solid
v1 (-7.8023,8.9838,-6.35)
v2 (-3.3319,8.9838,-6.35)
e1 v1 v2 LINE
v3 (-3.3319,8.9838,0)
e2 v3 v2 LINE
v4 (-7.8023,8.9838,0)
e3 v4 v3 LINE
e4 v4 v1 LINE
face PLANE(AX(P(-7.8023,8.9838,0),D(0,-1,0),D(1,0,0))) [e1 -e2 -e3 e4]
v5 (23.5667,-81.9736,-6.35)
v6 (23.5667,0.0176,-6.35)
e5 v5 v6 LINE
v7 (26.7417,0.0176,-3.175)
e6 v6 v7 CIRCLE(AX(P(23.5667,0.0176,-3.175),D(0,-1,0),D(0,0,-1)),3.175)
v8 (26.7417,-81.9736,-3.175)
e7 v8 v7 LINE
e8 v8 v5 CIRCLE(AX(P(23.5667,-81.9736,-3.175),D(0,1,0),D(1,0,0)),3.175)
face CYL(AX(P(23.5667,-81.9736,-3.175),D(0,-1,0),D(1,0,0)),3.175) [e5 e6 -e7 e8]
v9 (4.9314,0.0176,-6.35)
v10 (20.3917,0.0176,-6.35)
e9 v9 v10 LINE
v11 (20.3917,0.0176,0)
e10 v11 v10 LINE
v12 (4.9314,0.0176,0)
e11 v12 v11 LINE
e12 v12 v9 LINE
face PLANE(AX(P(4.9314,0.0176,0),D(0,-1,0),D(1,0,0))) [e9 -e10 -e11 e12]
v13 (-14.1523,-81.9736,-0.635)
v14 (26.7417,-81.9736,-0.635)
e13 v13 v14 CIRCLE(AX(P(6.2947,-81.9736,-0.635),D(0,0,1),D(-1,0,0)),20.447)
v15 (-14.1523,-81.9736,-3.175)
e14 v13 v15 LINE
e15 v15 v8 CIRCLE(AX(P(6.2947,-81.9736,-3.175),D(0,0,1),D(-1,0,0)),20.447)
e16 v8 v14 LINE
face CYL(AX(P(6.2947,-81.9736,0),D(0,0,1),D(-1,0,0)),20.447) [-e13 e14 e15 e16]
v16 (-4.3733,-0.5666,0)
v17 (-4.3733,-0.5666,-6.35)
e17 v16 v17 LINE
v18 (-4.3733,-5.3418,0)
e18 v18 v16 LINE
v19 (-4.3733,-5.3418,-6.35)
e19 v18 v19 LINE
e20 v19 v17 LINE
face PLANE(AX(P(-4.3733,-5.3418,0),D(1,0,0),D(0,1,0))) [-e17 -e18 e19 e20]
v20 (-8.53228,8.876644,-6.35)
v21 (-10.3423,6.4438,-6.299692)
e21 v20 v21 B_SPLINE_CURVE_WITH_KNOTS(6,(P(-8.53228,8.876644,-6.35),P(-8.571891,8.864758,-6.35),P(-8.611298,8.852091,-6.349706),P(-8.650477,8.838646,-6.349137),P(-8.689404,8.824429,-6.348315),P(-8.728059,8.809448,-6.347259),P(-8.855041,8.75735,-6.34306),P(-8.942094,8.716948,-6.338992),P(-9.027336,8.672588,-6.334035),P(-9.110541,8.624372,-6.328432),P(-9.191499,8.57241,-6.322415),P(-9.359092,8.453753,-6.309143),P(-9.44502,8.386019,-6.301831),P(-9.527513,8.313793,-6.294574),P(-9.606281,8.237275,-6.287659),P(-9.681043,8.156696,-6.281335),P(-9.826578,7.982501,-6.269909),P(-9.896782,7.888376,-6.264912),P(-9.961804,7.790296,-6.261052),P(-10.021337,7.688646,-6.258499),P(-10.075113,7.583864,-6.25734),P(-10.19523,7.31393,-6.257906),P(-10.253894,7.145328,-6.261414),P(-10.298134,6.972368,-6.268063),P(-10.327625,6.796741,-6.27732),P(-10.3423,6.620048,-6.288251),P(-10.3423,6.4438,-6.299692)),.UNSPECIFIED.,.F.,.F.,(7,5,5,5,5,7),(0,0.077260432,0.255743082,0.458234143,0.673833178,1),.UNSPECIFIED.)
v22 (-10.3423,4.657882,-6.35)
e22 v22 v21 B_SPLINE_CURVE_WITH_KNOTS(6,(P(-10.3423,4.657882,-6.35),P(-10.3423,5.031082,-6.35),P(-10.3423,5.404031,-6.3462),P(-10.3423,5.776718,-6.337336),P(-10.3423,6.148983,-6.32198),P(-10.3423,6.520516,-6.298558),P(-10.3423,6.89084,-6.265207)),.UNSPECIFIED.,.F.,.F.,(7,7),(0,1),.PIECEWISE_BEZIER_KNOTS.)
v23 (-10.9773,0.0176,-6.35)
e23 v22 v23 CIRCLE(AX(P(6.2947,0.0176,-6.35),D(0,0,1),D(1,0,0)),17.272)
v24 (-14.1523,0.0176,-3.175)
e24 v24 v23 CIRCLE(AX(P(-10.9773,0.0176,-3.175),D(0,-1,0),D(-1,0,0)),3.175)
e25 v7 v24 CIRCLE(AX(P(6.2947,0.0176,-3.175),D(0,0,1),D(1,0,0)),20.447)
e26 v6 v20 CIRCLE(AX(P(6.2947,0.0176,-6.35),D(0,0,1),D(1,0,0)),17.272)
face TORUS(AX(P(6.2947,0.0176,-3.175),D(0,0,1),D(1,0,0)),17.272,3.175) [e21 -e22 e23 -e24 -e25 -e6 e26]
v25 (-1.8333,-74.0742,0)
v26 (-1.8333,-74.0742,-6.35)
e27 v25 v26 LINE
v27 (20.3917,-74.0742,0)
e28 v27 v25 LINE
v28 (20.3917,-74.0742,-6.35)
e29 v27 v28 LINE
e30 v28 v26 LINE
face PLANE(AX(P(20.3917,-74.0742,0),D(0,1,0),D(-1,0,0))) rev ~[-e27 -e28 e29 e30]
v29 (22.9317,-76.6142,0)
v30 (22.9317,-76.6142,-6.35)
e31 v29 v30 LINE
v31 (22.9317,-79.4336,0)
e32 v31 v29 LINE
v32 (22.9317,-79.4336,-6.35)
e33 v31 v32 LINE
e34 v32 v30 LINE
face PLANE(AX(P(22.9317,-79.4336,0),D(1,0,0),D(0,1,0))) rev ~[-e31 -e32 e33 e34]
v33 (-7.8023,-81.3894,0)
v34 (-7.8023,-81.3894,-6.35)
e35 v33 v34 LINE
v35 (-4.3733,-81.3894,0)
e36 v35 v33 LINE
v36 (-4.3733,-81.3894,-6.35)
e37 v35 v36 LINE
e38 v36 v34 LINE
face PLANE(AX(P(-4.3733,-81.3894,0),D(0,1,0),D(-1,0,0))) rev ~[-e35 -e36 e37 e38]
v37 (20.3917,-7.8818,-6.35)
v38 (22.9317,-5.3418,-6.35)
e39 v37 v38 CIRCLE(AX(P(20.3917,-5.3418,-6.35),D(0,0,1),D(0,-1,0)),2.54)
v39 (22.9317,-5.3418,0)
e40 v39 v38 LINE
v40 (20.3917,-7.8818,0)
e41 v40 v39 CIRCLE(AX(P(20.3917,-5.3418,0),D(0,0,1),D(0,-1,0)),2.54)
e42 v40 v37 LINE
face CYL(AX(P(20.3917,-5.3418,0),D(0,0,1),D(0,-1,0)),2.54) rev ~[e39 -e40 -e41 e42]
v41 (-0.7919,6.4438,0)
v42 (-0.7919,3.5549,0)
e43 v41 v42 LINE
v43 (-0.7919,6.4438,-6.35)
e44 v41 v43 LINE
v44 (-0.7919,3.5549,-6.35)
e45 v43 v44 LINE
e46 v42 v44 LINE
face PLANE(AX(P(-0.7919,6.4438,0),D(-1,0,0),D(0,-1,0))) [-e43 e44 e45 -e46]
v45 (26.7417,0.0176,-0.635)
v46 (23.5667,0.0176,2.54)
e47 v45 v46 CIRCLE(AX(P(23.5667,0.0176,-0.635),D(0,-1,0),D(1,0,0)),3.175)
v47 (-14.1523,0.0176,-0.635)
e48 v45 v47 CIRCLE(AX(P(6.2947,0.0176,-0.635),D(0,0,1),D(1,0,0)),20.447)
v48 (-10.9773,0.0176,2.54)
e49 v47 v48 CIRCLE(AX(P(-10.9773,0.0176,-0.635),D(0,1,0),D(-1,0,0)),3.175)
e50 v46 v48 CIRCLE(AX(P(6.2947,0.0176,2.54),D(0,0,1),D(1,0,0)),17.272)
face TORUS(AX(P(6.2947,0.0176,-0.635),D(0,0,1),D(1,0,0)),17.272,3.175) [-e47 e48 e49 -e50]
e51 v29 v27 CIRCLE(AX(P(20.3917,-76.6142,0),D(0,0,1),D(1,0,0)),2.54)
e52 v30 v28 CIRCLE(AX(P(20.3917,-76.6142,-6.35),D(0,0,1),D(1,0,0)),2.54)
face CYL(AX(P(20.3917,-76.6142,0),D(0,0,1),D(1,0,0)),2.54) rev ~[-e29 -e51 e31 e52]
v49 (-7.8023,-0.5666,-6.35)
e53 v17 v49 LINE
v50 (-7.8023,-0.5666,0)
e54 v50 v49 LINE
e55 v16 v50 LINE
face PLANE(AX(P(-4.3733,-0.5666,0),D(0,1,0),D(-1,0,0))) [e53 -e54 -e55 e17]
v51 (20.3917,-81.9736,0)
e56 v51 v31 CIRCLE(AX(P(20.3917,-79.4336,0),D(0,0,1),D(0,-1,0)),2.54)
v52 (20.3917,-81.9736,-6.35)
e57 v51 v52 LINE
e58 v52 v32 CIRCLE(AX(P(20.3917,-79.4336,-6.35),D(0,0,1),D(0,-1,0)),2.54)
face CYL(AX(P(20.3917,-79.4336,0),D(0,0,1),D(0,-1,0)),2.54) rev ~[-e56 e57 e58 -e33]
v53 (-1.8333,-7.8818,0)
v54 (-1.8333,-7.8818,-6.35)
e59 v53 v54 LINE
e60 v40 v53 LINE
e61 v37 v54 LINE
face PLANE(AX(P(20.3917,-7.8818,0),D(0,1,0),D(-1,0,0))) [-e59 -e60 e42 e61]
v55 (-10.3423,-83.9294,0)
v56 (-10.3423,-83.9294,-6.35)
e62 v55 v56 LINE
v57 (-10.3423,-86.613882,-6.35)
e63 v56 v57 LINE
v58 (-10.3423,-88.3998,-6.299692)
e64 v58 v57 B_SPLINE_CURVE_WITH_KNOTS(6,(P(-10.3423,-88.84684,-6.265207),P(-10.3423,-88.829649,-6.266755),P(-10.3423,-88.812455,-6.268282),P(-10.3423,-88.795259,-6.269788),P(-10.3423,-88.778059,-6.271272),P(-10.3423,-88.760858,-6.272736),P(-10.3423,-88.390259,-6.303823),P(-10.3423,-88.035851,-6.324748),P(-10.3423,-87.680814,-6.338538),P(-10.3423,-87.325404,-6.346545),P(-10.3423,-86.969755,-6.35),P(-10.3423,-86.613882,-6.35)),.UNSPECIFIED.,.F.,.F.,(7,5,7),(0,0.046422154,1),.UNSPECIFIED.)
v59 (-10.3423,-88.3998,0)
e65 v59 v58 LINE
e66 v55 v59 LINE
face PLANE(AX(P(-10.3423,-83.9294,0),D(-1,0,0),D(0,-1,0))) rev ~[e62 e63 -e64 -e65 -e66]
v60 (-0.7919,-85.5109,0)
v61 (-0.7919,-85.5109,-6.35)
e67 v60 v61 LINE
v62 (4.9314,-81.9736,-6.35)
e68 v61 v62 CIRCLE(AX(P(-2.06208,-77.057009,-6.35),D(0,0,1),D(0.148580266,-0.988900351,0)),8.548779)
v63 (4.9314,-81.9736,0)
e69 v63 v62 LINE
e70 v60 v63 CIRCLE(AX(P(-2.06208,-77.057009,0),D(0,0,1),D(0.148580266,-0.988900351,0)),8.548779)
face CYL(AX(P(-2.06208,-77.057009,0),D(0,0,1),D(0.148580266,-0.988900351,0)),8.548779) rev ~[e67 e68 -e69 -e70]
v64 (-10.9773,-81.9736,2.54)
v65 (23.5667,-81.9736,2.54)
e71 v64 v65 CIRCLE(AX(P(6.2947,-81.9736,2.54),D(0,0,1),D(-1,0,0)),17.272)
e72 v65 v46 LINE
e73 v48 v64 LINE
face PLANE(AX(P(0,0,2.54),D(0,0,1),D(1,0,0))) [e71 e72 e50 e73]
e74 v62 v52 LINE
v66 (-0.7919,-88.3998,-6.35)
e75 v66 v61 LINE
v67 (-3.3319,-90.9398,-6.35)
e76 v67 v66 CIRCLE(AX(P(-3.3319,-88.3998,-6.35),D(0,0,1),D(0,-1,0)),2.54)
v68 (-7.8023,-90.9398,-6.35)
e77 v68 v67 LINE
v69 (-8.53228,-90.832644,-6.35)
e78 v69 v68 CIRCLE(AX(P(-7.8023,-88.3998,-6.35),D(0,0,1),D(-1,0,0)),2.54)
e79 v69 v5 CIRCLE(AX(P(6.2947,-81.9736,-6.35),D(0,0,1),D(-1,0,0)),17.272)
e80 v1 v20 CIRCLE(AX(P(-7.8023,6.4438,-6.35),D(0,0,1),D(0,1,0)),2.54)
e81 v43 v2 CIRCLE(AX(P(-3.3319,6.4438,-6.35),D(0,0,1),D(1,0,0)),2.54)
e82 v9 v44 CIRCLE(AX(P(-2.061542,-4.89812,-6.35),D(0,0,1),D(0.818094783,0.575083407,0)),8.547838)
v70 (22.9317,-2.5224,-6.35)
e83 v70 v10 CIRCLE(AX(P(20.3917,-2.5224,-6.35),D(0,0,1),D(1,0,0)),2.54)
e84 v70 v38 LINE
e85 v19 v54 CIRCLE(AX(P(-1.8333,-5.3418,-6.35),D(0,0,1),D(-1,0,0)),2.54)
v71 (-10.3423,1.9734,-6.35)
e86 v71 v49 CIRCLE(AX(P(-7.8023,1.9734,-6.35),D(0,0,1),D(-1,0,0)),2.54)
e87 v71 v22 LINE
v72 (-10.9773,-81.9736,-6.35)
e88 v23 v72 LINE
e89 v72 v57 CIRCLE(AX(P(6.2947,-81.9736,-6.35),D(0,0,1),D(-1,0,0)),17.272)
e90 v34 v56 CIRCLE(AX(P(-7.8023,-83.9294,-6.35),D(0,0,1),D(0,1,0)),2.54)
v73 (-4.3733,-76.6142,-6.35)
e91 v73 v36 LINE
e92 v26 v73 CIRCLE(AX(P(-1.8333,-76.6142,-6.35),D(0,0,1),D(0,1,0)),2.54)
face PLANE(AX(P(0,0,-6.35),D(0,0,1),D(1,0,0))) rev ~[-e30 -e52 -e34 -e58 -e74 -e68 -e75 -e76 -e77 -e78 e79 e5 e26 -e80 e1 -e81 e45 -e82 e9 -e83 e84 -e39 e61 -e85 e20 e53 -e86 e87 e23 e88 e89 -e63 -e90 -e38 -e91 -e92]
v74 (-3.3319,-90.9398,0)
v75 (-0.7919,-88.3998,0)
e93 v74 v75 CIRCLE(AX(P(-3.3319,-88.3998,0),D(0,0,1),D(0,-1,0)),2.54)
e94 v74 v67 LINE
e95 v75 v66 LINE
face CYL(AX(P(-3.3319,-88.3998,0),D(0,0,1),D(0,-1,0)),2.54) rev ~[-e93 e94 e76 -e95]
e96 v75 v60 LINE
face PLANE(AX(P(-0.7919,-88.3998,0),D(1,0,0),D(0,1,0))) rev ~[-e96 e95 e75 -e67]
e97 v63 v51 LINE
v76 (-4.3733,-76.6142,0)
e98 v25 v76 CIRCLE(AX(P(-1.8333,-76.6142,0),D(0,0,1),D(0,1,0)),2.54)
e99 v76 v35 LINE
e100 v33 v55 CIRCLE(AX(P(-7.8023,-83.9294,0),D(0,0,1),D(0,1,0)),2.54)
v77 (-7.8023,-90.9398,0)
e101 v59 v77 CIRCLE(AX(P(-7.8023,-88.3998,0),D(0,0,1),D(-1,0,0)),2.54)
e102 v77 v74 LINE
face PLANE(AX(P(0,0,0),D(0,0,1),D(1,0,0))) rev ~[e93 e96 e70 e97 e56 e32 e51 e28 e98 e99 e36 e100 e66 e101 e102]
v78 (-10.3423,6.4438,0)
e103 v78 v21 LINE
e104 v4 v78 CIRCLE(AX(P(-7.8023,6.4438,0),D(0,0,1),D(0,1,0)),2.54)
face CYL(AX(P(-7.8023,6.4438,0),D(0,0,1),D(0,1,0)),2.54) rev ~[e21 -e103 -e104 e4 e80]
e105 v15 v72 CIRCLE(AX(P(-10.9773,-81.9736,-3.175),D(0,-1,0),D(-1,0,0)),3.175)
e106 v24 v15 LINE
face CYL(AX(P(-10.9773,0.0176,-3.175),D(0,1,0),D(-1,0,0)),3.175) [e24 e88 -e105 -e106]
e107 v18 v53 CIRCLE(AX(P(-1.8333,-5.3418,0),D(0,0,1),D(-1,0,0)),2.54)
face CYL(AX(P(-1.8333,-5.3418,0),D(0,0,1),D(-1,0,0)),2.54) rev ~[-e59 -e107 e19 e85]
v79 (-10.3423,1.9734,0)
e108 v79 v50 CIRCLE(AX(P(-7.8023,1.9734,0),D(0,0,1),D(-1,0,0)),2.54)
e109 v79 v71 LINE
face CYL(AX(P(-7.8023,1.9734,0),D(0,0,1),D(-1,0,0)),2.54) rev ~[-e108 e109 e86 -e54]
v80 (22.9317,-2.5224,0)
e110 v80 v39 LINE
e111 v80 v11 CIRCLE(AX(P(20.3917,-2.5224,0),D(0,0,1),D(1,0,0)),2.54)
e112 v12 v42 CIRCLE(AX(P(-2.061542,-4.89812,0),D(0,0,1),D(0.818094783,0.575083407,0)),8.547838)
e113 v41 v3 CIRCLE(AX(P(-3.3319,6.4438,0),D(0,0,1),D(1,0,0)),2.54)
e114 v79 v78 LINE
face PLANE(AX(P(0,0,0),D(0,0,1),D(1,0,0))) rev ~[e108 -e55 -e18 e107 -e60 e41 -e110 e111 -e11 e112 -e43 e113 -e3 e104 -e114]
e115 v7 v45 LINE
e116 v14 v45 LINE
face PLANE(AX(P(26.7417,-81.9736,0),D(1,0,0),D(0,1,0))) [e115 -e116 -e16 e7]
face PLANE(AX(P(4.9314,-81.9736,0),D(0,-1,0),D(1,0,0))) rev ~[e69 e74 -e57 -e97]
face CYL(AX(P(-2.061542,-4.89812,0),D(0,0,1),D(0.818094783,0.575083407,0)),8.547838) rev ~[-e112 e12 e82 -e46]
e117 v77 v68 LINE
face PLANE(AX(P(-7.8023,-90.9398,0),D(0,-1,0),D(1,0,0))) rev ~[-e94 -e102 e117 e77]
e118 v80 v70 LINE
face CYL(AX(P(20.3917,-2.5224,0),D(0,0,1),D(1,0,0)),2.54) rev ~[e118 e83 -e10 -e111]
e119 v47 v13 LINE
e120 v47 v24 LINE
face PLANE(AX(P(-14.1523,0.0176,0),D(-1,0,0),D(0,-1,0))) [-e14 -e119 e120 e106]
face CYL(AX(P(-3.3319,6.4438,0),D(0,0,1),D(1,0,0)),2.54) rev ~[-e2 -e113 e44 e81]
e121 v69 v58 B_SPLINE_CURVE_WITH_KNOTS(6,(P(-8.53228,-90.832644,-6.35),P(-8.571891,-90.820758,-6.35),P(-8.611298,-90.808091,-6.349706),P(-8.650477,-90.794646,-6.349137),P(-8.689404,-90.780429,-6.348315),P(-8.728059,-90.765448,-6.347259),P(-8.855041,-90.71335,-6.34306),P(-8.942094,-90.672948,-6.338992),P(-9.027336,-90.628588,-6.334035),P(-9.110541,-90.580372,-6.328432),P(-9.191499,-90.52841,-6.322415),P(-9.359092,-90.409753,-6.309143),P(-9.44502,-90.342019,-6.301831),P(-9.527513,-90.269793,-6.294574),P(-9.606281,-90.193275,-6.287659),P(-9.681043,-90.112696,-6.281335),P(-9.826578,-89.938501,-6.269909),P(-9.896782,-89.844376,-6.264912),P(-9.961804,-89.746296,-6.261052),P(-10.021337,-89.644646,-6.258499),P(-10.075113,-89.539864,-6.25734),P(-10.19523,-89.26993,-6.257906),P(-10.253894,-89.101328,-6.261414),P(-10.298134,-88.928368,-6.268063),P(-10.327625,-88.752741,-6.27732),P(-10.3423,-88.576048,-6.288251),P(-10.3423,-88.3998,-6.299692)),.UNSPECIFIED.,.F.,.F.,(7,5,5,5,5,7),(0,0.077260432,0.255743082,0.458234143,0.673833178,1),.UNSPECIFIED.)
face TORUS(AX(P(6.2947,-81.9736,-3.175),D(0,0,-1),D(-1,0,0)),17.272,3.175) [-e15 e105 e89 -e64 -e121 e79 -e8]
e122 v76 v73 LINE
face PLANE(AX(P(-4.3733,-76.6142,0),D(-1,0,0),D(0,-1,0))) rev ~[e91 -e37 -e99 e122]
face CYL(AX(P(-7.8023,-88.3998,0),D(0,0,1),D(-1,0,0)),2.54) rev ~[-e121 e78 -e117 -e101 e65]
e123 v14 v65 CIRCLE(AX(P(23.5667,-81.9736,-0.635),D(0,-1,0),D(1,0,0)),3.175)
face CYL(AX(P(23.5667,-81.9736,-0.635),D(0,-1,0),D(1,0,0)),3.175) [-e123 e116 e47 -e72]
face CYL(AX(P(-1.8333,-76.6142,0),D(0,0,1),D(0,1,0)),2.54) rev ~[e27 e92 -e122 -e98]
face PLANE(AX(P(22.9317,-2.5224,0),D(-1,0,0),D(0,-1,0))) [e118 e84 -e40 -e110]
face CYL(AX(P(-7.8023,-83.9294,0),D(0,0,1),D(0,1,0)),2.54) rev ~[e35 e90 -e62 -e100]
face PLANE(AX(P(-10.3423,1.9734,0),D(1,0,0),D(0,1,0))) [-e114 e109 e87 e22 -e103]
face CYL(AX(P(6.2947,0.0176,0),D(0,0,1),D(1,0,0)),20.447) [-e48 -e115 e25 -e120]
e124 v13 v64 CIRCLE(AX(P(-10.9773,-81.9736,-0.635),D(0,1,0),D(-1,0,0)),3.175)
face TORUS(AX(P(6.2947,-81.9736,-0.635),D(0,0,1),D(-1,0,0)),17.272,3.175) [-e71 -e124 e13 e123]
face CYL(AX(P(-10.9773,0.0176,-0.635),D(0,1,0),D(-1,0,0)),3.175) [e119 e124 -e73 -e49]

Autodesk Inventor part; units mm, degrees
ref_plane "YZ Plane" through (0, 0, 0) normal (1, 0, 0) x (0, 1, 0)
ref_plane "XZ Plane" through (0, 0, 0) normal (0, 1, 0) x (-1, 0, 0)
ref_plane "XY Plane" through (0, 0, 0) normal (0, 0, 1) x (1, 0, 0)
ref_plane "Work Plane1" through (0, 0, 0) normal (0, 0, 1) x (1, 0, 0)
sketch "Sketch1" plane through (0, 0, 0) normal (0, 0, 1) x (1, 0, 0)
  arc A0 (20.3917, -80.7036) -> (21.6617, -79.4336) centre (20.3917, -79.4336) ccw projected
  line L0 (21.6617, -79.4336) -> (21.6617, -76.6142) projected
  arc A1 (21.6617, -76.6142) -> (20.3917, -75.3442) centre (20.3917, -76.6142) ccw projected
  line L1 (20.3917, -75.3442) -> (-1.8333, -75.3442) projected
  arc A2 (-1.8333, -75.3442) -> (-3.1033, -76.6142) centre (-1.8333, -76.6142) ccw projected
  line L2 (-3.1033, -76.6142) -> (-3.1033, -81.3894) projected
  arc A3 (-4.3733, -82.6594) -> (-3.1033, -81.3894) centre (-4.3733, -81.3894) ccw projected
  line L3 (-4.3733, -82.6594) -> (-7.8023, -82.6594) projected
  arc A4 (-7.8023, -82.6594) -> (-9.0723, -83.9294) centre (-7.8023, -83.9294) ccw projected
  line L4 (-9.0723, -83.9294) -> (-9.0723, -88.3998) projected
  arc A5 (-9.0723, -88.3998) -> (-7.8023, -89.6698) centre (-7.8023, -88.3998) ccw projected
  line L5 (-7.8023, -89.6698) -> (-3.3319, -89.6698) projected
  arc A6 (-3.3319, -89.6698) -> (-2.0619, -88.3998) centre (-3.3319, -88.3998) ccw projected
  line L6 (-2.0619, -88.3998) -> (-2.0619, -85.5109) projected
  arc A7 (-0.9806, -84.255) -> (-2.0619, -85.5109) centre (-0.7919, -85.5109) ccw projected
  arc A8 (-0.9806, -84.255) -> (4.2373, -80.7036) centre (-2.0619, -77.0575) ccw projected
  line L7 (4.2373, -80.7036) -> (20.3917, -80.7036) projected
  arc A9 (21.6617, -2.5224) -> (20.3917, -1.2524) centre (20.3917, -2.5224) ccw projected
  line L8 (4.2373, -1.2524) -> (20.3917, -1.2524) projected
  arc A10 (4.2373, -1.2524) -> (-0.9806, 2.299) centre (-2.0619, -4.8985) ccw projected
  arc A11 (-2.0619, 3.5549) -> (-0.9806, 2.299) centre (-0.7919, 3.5549) ccw projected
  line L9 (-2.0619, 6.4438) -> (-2.0619, 3.5549) projected
  arc A12 (-2.0619, 6.4438) -> (-3.3319, 7.7138) centre (-3.3319, 6.4438) ccw projected
  line L10 (-7.8023, 7.7138) -> (-3.3319, 7.7138) projected
  arc A13 (-7.8023, 7.7138) -> (-9.0723, 6.4438) centre (-7.8023, 6.4438) ccw projected
  line L11 (-9.0723, 1.9734) -> (-9.0723, 6.4438) projected
  arc A14 (-9.0723, 1.9734) -> (-7.8023, 0.7034) centre (-7.8023, 1.9734) ccw projected
  line L12 (-4.3733, 0.7034) -> (-7.8023, 0.7034) projected
  arc A15 (-3.1033, -0.5666) -> (-4.3733, 0.7034) centre (-4.3733, -0.5666) ccw projected
  line L13 (-3.1033, -5.3418) -> (-3.1033, -0.5666) projected
  arc A16 (-3.1033, -5.3418) -> (-1.8333, -6.6118) centre (-1.8333, -5.3418) ccw projected
  line L14 (20.3917, -6.6118) -> (-1.8333, -6.6118) projected
  arc A17 (20.3917, -6.6118) -> (21.6617, -5.3418) centre (20.3917, -5.3418) ccw projected
  line L15 (21.6617, -2.5224) -> (21.6617, -5.3418) projected
  arc A18 (20.3917, -81.9736) -> (22.9317, -79.4336) centre (20.3917, -79.4336) ccw
  line L16 (22.9317, -79.4336) -> (22.9317, -76.6142)
  arc A19 (22.9317, -76.6142) -> (20.3917, -74.0742) centre (20.3917, -76.6142) ccw
  line L17 (20.3917, -74.0742) -> (-1.8333, -74.0742)
  arc A20 (-1.8333, -74.0742) -> (-4.3733, -76.6142) centre (-1.8333, -76.6142) ccw
  line L18 (-4.3733, -76.6142) -> (-4.3733, -81.3894)
  line L19 (-4.3733, -81.3894) -> (-7.8023, -81.3894)
  arc A21 (-7.8023, -81.3894) -> (-10.3423, -83.9294) centre (-7.8023, -83.9294) ccw
  line L20 (-10.3423, -83.9294) -> (-10.3423, -88.3998)
  arc A22 (-10.3423, -88.3998) -> (-7.8023, -90.9398) centre (-7.8023, -88.3998) ccw
  line L21 (-7.8023, -90.9398) -> (-3.3319, -90.9398)
  arc A23 (-3.3319, -90.9398) -> (-0.7919, -88.3998) centre (-3.3319, -88.3998) ccw
  line L22 (-0.7919, -88.3998) -> (-0.7919, -85.5109)
  arc A24 (-0.7919, -85.5109) -> (4.9314, -81.9736) centre (-2.0619, -77.0575) ccw
  line L23 (4.9314, -81.9736) -> (20.3917, -81.9736)
  arc A25 (-4.3733, -5.3418) -> (-1.8333, -7.8818) centre (-1.8333, -5.3418) ccw
  line L24 (-4.3733, -5.3418) -> (-4.3733, -0.5666)
  line L25 (-4.3733, -0.5666) -> (-7.8023, -0.5666)
  arc A26 (-10.3423, 1.9734) -> (-7.8023, -0.5666) centre (-7.8023, 1.9734) ccw
  line L26 (-10.3423, 1.9734) -> (-10.3423, 6.4438)
  arc A27 (-7.8023, 8.9838) -> (-10.3423, 6.4438) centre (-7.8023, 6.4438) ccw
  line L27 (-7.8023, 8.9838) -> (-3.3319, 8.9838)
  arc A28 (-0.7919, 6.4438) -> (-3.3319, 8.9838) centre (-3.3319, 6.4438) ccw
  line L28 (-0.7919, 6.4438) -> (-0.7919, 3.5549)
  arc A29 (4.9314, 0.0176) -> (-0.7919, 3.5549) centre (-2.0619, -4.8985) ccw
  line L29 (4.9314, 0.0176) -> (20.3917, 0.0176)
  arc A30 (22.9317, -2.5224) -> (20.3917, 0.0176) centre (20.3917, -2.5224) ccw
  line L30 (22.9317, -2.5224) -> (22.9317, -5.3418)
  arc A31 (20.3917, -7.8818) -> (22.9317, -5.3418) centre (20.3917, -5.3418) ccw
  line L31 (20.3917, -7.8818) -> (-1.8333, -7.8818)
  line L32 (6.2947, -102.4206) -> (6.2947, 20.4646) construction
  line L33 (26.7417, -81.9736) -> (26.7417, 0.0176)
  line L34 (-14.1523, 0.0176) -> (-14.1523, -81.9736)
  arc A32 (-14.1523, -81.9736) -> (26.7417, -81.9736) centre (6.2947, -81.9736) ccw
  arc A33 (26.7417, 0.0176) -> (-14.1523, 0.0176) centre (6.2947, 0.0176) ccw
  point P0 (0, 0)
  point P1 (6.2947, -40.978)
  dimension "d0" = 1.27
  dimension "d1" = 1.27
  dimension "d2" = 3.81
  dimension "d3" = 3.81
  dimension "d4" = 33.0962
  dimension "d5" = 33.0962
extrude "Extrusion1" add sketch "Sketch1" against normal blind 6.35 contours A32 L34 A33 L33
sketch "Sketch2" plane through (0, 0, 0) normal (0, 0, 1) x (1, 0, 0)
  line L0 (20.3917, -7.8818) -> (-1.8333, -7.8818) projected
  arc A0 (-4.3733, -5.3418) -> (-1.8333, -7.8818) centre (-1.8333, -5.3418) ccw projected
  line L1 (-4.3733, -5.3418) -> (-4.3733, -0.5666) projected
  line L2 (-4.3733, -0.5666) -> (-7.8023, -0.5666) projected
  arc A1 (-10.3423, 1.9734) -> (-7.8023, -0.5666) centre (-7.8023, 1.9734) ccw projected
  line L3 (-10.3423, 1.9734) -> (-10.3423, 6.4438) projected
  arc A2 (-7.8023, 8.9838) -> (-10.3423, 6.4438) centre (-7.8023, 6.4438) ccw projected
  line L4 (-7.8023, 8.9838) -> (-3.3319, 8.9838) projected
  arc A3 (-0.7919, 6.4438) -> (-3.3319, 8.9838) centre (-3.3319, 6.4438) ccw projected
  line L5 (-0.7919, 6.4438) -> (-0.7919, 3.5549) projected
  arc A4 (4.9314, 0.0176) -> (-0.7919, 3.5549) centre (-2.0619, -4.8985) ccw projected
  line L6 (4.9314, 0.0176) -> (20.3917, 0.0176) projected
  arc A5 (22.9317, -2.5224) -> (20.3917, 0.0176) centre (20.3917, -2.5224) ccw projected
  line L7 (22.9317, -2.5224) -> (22.9317, -5.3418) projected
  arc A6 (20.3917, -7.8818) -> (22.9317, -5.3418) centre (20.3917, -5.3418) ccw projected
  line L8 (22.9317, -76.6142) -> (22.9317, -79.4336) projected
  arc A7 (20.3917, -81.9736) -> (22.9317, -79.4336) centre (20.3917, -79.4336) ccw projected
  line L9 (20.3917, -81.9736) -> (4.9314, -81.9736) projected
  arc A8 (-0.7919, -85.5109) -> (4.9314, -81.9736) centre (-2.0619, -77.0575) ccw projected
  line L10 (-0.7919, -85.5109) -> (-0.7919, -88.3998) projected
  arc A9 (-3.3319, -90.9398) -> (-0.7919, -88.3998) centre (-3.3319, -88.3998) ccw projected
  line L11 (-3.3319, -90.9398) -> (-7.8023, -90.9398) projected
  arc A10 (-10.3423, -88.3998) -> (-7.8023, -90.9398) centre (-7.8023, -88.3998) ccw projected
  line L12 (-10.3423, -88.3998) -> (-10.3423, -83.9294) projected
  arc A11 (-7.8023, -81.3894) -> (-10.3423, -83.9294) centre (-7.8023, -83.9294) ccw projected
  line L13 (-7.8023, -81.3894) -> (-4.3733, -81.3894) projected
  line L14 (-4.3733, -81.3894) -> (-4.3733, -76.6142) projected
  arc A12 (-1.8333, -74.0742) -> (-4.3733, -76.6142) centre (-1.8333, -76.6142) ccw projected
  line L15 (-1.8333, -74.0742) -> (20.3917, -74.0742) projected
  arc A13 (22.9317, -76.6142) -> (20.3917, -74.0742) centre (20.3917, -76.6142) ccw projected
  line L16 (26.7417, -81.9736) -> (26.7417, 0.0176) projected
  arc A14 (26.7417, 0.0176) -> (-14.1523, 0.0176) centre (6.2947, 0.0176) ccw projected
  line L17 (-14.1523, 0.0176) -> (-14.1523, -81.9736) projected
  arc A15 (-14.1523, -81.9736) -> (26.7417, -81.9736) centre (6.2947, -81.9736) ccw projected
  point P0 (0, 0)
extrude "Extrusion2" add sketch "Sketch2" along normal blind 2.54 contours L0 A0 L1 L2 A1 L3 A2 L4 A3 L5 A4 L6 A5 L7 A6 | L8 A7 L9 A8 L10 A9 L11 A10 L12 A11 L13 L14 A12 L15 A13 | A15 L17 A14 L16
fillet "Fillet1" radius 3.175 8 edges at (-14.1523, -40.978, 2.54) (6.2947, -102.4206, 2.54) (26.7417, -40.978, 2.54) (6.2947, 20.4646, 2.54) (-14.1523, -40.978, -6.35) (6.2947, 20.4646, -6.35) (26.7417, -40.978, -6.35) (6.2947, -102.4206, -6.35)
equation "\"d1\" = d0"
equation "\"d3\" = d2"
equation "\"d4\" = d5"
properties part number "cap"
